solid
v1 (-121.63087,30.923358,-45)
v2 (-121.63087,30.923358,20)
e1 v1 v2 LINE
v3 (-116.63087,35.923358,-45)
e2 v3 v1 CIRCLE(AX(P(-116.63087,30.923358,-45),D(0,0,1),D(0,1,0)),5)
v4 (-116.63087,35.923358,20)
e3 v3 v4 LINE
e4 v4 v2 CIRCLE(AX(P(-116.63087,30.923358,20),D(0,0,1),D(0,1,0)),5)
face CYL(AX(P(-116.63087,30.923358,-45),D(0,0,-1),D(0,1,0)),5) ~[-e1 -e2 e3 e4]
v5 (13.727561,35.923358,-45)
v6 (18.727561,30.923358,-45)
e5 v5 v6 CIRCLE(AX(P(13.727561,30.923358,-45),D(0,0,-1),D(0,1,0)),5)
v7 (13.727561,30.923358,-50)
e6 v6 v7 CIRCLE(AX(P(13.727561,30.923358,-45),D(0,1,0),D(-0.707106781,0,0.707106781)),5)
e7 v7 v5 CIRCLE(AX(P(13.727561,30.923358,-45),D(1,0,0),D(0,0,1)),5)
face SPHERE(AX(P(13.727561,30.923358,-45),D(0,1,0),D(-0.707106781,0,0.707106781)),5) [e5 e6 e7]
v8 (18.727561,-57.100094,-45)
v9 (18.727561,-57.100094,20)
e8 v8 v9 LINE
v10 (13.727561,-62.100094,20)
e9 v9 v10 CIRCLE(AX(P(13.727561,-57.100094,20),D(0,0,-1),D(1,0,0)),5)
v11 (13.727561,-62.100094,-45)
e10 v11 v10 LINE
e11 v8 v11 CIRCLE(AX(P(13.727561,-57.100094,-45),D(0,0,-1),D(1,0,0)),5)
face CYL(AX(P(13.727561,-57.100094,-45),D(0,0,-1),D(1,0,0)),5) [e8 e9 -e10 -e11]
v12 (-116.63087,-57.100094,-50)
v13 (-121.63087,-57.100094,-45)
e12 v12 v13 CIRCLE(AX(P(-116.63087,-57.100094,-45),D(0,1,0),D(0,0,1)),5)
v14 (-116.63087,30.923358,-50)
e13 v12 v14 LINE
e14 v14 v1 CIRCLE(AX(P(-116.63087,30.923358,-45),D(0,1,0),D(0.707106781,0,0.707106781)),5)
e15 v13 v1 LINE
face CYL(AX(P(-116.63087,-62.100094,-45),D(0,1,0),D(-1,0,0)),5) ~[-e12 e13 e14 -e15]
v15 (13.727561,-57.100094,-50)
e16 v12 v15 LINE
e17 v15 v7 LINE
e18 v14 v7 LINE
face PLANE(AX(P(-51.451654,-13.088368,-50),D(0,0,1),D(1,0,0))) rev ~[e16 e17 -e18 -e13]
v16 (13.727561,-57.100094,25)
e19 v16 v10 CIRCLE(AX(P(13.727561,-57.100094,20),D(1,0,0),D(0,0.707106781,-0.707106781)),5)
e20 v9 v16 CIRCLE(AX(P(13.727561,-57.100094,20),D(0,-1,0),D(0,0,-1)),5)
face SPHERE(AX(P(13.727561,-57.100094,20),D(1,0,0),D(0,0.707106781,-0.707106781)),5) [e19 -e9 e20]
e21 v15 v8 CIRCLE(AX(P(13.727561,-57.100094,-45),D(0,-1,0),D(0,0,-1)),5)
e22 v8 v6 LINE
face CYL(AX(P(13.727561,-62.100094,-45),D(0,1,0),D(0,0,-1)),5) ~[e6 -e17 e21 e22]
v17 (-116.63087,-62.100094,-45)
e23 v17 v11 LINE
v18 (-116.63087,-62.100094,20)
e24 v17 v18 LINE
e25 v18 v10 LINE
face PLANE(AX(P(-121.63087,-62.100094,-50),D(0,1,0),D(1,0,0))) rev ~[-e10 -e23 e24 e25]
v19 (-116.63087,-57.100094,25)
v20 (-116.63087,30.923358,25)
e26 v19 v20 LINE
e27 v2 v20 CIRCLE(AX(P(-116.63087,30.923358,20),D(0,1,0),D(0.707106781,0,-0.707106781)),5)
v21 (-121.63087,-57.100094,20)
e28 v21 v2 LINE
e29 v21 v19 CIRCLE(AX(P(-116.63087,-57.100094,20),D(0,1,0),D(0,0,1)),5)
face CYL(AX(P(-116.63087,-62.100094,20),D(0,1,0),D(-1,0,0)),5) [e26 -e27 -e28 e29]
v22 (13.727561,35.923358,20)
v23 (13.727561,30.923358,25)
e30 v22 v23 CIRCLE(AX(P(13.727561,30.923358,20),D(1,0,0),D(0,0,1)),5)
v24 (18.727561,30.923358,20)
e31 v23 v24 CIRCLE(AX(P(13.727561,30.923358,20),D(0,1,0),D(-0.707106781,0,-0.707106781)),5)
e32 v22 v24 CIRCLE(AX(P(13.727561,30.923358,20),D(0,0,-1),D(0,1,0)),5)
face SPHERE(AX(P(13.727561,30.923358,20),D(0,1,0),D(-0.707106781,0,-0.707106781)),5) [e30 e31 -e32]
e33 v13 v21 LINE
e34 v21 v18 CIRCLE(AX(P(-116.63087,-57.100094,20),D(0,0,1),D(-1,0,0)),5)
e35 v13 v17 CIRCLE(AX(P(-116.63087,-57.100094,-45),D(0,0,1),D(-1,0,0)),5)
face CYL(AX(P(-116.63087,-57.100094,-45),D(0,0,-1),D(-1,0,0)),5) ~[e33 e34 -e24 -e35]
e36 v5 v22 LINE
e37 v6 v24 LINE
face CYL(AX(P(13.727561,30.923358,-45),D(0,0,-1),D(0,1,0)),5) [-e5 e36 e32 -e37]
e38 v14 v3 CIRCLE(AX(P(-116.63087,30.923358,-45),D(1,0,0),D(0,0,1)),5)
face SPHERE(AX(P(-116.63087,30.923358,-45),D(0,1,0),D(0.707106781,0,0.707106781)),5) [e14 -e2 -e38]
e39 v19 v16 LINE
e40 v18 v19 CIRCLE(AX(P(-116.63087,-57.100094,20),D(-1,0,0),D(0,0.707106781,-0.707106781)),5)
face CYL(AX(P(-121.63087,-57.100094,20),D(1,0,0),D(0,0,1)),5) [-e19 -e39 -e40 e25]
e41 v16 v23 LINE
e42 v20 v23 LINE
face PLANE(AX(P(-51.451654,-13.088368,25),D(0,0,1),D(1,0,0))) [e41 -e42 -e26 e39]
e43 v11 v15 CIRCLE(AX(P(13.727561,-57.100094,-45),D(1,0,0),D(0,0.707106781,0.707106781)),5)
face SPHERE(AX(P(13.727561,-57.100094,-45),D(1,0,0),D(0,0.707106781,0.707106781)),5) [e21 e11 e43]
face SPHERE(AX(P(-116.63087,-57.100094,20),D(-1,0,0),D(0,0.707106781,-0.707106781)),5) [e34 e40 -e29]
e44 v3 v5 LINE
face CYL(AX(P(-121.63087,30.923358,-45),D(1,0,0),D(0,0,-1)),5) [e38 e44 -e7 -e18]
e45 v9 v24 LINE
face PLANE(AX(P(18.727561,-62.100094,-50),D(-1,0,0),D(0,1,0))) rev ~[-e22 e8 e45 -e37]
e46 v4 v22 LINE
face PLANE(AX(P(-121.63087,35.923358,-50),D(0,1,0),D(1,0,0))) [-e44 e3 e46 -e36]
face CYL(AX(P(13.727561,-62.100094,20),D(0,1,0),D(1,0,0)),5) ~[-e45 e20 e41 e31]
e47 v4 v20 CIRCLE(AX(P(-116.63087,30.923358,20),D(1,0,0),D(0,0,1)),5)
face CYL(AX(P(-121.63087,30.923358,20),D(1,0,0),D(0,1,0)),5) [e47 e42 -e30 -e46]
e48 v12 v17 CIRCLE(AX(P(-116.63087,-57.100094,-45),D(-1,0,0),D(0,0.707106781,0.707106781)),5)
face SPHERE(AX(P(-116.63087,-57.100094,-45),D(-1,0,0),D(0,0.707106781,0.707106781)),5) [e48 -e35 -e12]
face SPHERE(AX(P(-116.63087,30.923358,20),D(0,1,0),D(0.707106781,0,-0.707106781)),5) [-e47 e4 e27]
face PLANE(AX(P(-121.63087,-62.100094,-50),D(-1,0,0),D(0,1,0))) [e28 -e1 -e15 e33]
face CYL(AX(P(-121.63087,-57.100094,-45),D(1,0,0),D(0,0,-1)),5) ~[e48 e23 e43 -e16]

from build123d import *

# Parameters (mm, degrees)
F0_W         = 140.3584312648
F0_H         = 98.0234518647
F1_DEPTH     = 25
F2_DEPTH     = 50
F3_DEPTH     = 25
F4_R         = 5
F5_T1_DEPTH  = 65
F5_S5_W      = 5
F5_S5_H      = 5
F5_T6_DEPTH  = 5
F5_S11_W     = 5
F5_S11_H     = 5
F5_T12_DEPTH = 5
F5_S17_W     = 5
F5_S17_H     = 5
F5_T18_DEPTH = 5
F5_S23_W     = 5
F5_S23_H     = 5
F5_T24_DEPTH = 5
F5_S29_W     = 5
F5_S29_H     = 5
F5_T30_DEPTH = 5
F5_S35_W     = 5
F5_S35_H     = 5
F5_T36_DEPTH = 5
F5_S41_W     = 5
F5_S41_H     = 5
F5_T42_DEPTH = 5
F5_S47_W     = 5
F5_S47_H     = 5
F5_T48_DEPTH = 5


# Not quite as in the source:
# - a fillet or chamfer that OpenCascade refuses, or shapes differently, is made with other operations: its cross-section is extruded or revolved along the edge and cut away or added


with BuildPart() as f1:
    # F0 (on Top) → F1 (new body)
    with BuildSketch(Plane.XY):
        with Locations((-51.4516541734, -13.0883678794)):
            Rectangle(F0_W, F0_H)
    extrude(amount=F1_DEPTH)

    # F2 (add): a face of the model
    f2_faces = [f1.faces().sort_by_distance(p)[0] for p in [
        (-51.4516541734, -13.0883678794, 0),
    ]]
    extrude(f2_faces, amount=F2_DEPTH)

    # F3 (add): a face of the model
    f3_faces = [f1.faces().sort_by_distance(p)[0] for p in [
        (-51.4516541734, -13.0883678794, -50),
    ]]
    extrude(f3_faces, amount=-F3_DEPTH)

    # F4
    f4_edges = [f1.edges().sort_by_distance(p)[0] for p in [
        (18.727561, -13.088368, 25),
        (-121.63087, -13.088368, 25),
        (-51.451654, 35.923358, 25),
        (-51.451654, -62.100094, 25),
        (-51.451654, 35.923358, -50),
        (-121.63087, -13.088368, -50),
        (-51.451654, -62.100094, -50),
        (18.727561, -13.088368, -50),
    ]]
    fillet(f4_edges, radius=F4_R)

    # F5: fillet of radius 5 on 4 edges, made by hand

    # F5_s2 → F5_t1 (cut)
    with BuildSketch(Plane.XY.offset(-45)):
        with BuildLine():
            ThreePointArc((-116.6308698058, 35.923358053), (-120.1664037117, 34.4588919589), (-121.6308698058, 30.923358053))
            Line((-121.6308698058, 30.923358053), (-121.6308698058, 35.923358053))
            Line((-121.6308698058, 35.923358053), (-116.6308698058, 35.923358053))
        make_face()
        with BuildLine():
            ThreePointArc((13.7275614589, 35.923358053), (17.2630953649, 34.4588919589), (18.7275614589, 30.923358053))
            Line((18.7275614589, 30.923358053), (18.7275614589, 35.923358053))
            Line((18.7275614589, 35.923358053), (13.7275614589, 35.923358053))
        make_face()
        with BuildLine():
            ThreePointArc((18.7275614589, -57.1000938118), (17.2630953649, -60.6356277177), (13.7275614589, -62.1000938118))
            Line((13.7275614589, -62.1000938118), (18.7275614589, -62.1000938118))
            Line((18.7275614589, -62.1000938118), (18.7275614589, -57.1000938118))
        make_face()
        with BuildLine():
            ThreePointArc((-121.6308698058, -57.1000938118), (-120.1664037117, -60.6356277177), (-116.6308698058, -62.1000938118))
            Line((-116.6308698058, -62.1000938118), (-121.6308698058, -62.1000938118))
            Line((-121.6308698058, -62.1000938118), (-121.6308698058, -57.1000938118))
        make_face()
    extrude(amount=F5_T1_DEPTH, mode=Mode.SUBTRACT)


with BuildPart() as f5_tool4:
    # F5_s5 → F5_t6 (new body)
    with BuildSketch(Plane.YZ.offset(-116.6308698058)):
        with Locations((-59.6000938118, -47.5)):
            Rectangle(F5_S5_W, F5_S5_H)
    extrude(amount=-F5_T6_DEPTH)

    # F5_s7 → F5_t8 (revolve, cut)
    with BuildSketch(Plane(origin=(-116.6308698058, -57.1000938118, -45), x_dir=(0, 0.7071067812, 0.7071067812), z_dir=(0, -0.7071067812, 0.7071067812))):
        with BuildLine():
            ThreePointArc((0, -5), (5, 0), (0, 5))
            Line((0, 5), (0, -5))
        make_face()
    revolve(axis=Axis((-116.6308698058, -57.1000938118, -45), (-1, 0, 0)), mode=Mode.SUBTRACT)


with BuildPart() as f1_1:
    add(f1.part)

    # F5_t3: cut F5_tool4
    add(f5_tool4.part, mode=Mode.SUBTRACT)


with BuildPart() as f5_tool10:
    # F5_s11 → F5_t12 (new body)
    with BuildSketch(Plane.YZ.offset(-116.6308698058)):
        with Locations((-59.6000938118, 22.5)):
            Rectangle(F5_S11_W, F5_S11_H)
    extrude(amount=-F5_T12_DEPTH)

    # F5_s13 → F5_t14 (revolve, cut)
    with BuildSketch(Plane(origin=(-116.6308698058, -57.1000938118, 20), x_dir=(0, 0.7071067812, -0.7071067812), z_dir=(0, 0.7071067812, 0.7071067812))):
        with BuildLine():
            ThreePointArc((0, -5), (5, 0), (0, 5))
            Line((0, 5), (0, -5))
        make_face()
    revolve(axis=Axis((-116.6308698058, -57.1000938118, 20), (-1, 0, 0)), mode=Mode.SUBTRACT)


with BuildPart() as f1_2:
    add(f1_1.part)

    # F5_t9: cut F5_tool10
    add(f5_tool10.part, mode=Mode.SUBTRACT)


with BuildPart() as f5_tool16:
    # F5_s17 → F5_t18 (new body)
    with BuildSketch(Plane.YZ.offset(13.7275614589)):
        with Locations((-59.6000938118, 22.5)):
            Rectangle(F5_S17_W, F5_S17_H)
    extrude(amount=F5_T18_DEPTH)

    # F5_s19 → F5_t20 (revolve, cut)
    with BuildSketch(Plane(origin=(13.7275614589, -57.1000938118, 20), x_dir=(0, 0.7071067812, -0.7071067812), z_dir=(0, -0.7071067812, -0.7071067812))):
        with BuildLine():
            ThreePointArc((0, -5), (5, 0), (0, 5))
            Line((0, 5), (0, -5))
        make_face()
    revolve(axis=Axis((13.7275614589, -57.1000938118, 20), (1, 0, 0)), mode=Mode.SUBTRACT)


with BuildPart() as f1_3:
    add(f1_2.part)

    # F5_t15: cut F5_tool16
    add(f5_tool16.part, mode=Mode.SUBTRACT)


with BuildPart() as f5_tool22:
    # F5_s23 → F5_t24 (new body)
    with BuildSketch(Plane.YZ.offset(13.7275614589)):
        with Locations((-59.6000938118, -47.5)):
            Rectangle(F5_S23_W, F5_S23_H)
    extrude(amount=F5_T24_DEPTH)

    # F5_s25 → F5_t26 (revolve, cut)
    with BuildSketch(Plane(origin=(13.7275614589, -57.1000938118, -45), x_dir=(0, 0.7071067812, 0.7071067812), z_dir=(0, 0.7071067812, -0.7071067812))):
        with BuildLine():
            ThreePointArc((0, -5), (5, 0), (0, 5))
            Line((0, 5), (0, -5))
        make_face()
    revolve(axis=Axis((13.7275614589, -57.1000938118, -45), (1, 0, 0)), mode=Mode.SUBTRACT)


with BuildPart() as f1_4:
    add(f1_3.part)

    # F5_t21: cut F5_tool22
    add(f5_tool22.part, mode=Mode.SUBTRACT)


with BuildPart() as f5_tool28:
    # F5_s29 → F5_t30 (new body)
    with BuildSketch(Plane.XZ.offset(-30.923358053)):
        with Locations((16.2275614589, 22.5)):
            Rectangle(F5_S29_W, F5_S29_H)
    extrude(amount=-F5_T30_DEPTH)

    # F5_s31 → F5_t32 (revolve, cut)
    with BuildSketch(Plane(origin=(13.7275614589, 30.923358053, 20), x_dir=(-0.7071067812, 0, -0.7071067812), z_dir=(0.7071067812, 0, -0.7071067812))):
        with BuildLine():
            ThreePointArc((0, -5), (5, 0), (0, 5))
            Line((0, 5), (0, -5))
        make_face()
    revolve(axis=Axis((13.7275614589, 30.923358053, 20), (0, 1, 0)), mode=Mode.SUBTRACT)


with BuildPart() as f1_5:
    add(f1_4.part)

    # F5_t27: cut F5_tool28
    add(f5_tool28.part, mode=Mode.SUBTRACT)


with BuildPart() as f5_tool34:
    # F5_s35 → F5_t36 (new body)
    with BuildSketch(Plane.XZ.offset(-30.923358053)):
        with Locations((16.2275614589, -47.5)):
            Rectangle(F5_S35_W, F5_S35_H)
    extrude(amount=-F5_T36_DEPTH)

    # F5_s37 → F5_t38 (revolve, cut)
    with BuildSketch(Plane(origin=(13.7275614589, 30.923358053, -45), x_dir=(-0.7071067812, 0, 0.7071067812), z_dir=(-0.7071067812, 0, -0.7071067812))):
        with BuildLine():
            ThreePointArc((0, -5), (5, 0), (0, 5))
            Line((0, 5), (0, -5))
        make_face()
    revolve(axis=Axis((13.7275614589, 30.923358053, -45), (0, 1, 0)), mode=Mode.SUBTRACT)


with BuildPart() as f1_6:
    add(f1_5.part)

    # F5_t33: cut F5_tool34
    add(f5_tool34.part, mode=Mode.SUBTRACT)


with BuildPart() as f5_tool40:
    # F5_s41 → F5_t42 (new body)
    with BuildSketch(Plane.XZ.offset(-30.923358053)):
        with Locations((-119.1308698058, -47.5)):
            Rectangle(F5_S41_W, F5_S41_H)
    extrude(amount=-F5_T42_DEPTH)

    # F5_s43 → F5_t44 (revolve, cut)
    with BuildSketch(Plane(origin=(-116.6308698058, 30.923358053, -45), x_dir=(0.7071067812, 0, 0.7071067812), z_dir=(-0.7071067812, 0, 0.7071067812))):
        with BuildLine():
            ThreePointArc((0, -5), (5, 0), (0, 5))
            Line((0, 5), (0, -5))
        make_face()
    revolve(axis=Axis((-116.6308698058, 30.923358053, -45), (0, 1, 0)), mode=Mode.SUBTRACT)


with BuildPart() as f1_7:
    add(f1_6.part)

    # F5_t39: cut F5_tool40
    add(f5_tool40.part, mode=Mode.SUBTRACT)


with BuildPart() as f5_tool46:
    # F5_s47 → F5_t48 (new body)
    with BuildSketch(Plane.XZ.offset(-30.923358053)):
        with Locations((-119.1308698058, 22.5)):
            Rectangle(F5_S47_W, F5_S47_H)
    extrude(amount=-F5_T48_DEPTH)

    # F5_s49 → F5_t50 (revolve, cut)
    with BuildSketch(Plane(origin=(-116.6308698058, 30.923358053, 20), x_dir=(0.7071067812, 0, -0.7071067812), z_dir=(0.7071067812, 0, 0.7071067812))):
        with BuildLine():
            ThreePointArc((0, -5), (5, 0), (0, 5))
            Line((0, 5), (0, -5))
        make_face()
    revolve(axis=Axis((-116.6308698058, 30.923358053, 20), (0, 1, 0)), mode=Mode.SUBTRACT)


with BuildPart() as f1_8:
    add(f1_7.part)

    # F5_t45: cut F5_tool46
    add(f5_tool46.part, mode=Mode.SUBTRACT)


solid = f1_8.part
